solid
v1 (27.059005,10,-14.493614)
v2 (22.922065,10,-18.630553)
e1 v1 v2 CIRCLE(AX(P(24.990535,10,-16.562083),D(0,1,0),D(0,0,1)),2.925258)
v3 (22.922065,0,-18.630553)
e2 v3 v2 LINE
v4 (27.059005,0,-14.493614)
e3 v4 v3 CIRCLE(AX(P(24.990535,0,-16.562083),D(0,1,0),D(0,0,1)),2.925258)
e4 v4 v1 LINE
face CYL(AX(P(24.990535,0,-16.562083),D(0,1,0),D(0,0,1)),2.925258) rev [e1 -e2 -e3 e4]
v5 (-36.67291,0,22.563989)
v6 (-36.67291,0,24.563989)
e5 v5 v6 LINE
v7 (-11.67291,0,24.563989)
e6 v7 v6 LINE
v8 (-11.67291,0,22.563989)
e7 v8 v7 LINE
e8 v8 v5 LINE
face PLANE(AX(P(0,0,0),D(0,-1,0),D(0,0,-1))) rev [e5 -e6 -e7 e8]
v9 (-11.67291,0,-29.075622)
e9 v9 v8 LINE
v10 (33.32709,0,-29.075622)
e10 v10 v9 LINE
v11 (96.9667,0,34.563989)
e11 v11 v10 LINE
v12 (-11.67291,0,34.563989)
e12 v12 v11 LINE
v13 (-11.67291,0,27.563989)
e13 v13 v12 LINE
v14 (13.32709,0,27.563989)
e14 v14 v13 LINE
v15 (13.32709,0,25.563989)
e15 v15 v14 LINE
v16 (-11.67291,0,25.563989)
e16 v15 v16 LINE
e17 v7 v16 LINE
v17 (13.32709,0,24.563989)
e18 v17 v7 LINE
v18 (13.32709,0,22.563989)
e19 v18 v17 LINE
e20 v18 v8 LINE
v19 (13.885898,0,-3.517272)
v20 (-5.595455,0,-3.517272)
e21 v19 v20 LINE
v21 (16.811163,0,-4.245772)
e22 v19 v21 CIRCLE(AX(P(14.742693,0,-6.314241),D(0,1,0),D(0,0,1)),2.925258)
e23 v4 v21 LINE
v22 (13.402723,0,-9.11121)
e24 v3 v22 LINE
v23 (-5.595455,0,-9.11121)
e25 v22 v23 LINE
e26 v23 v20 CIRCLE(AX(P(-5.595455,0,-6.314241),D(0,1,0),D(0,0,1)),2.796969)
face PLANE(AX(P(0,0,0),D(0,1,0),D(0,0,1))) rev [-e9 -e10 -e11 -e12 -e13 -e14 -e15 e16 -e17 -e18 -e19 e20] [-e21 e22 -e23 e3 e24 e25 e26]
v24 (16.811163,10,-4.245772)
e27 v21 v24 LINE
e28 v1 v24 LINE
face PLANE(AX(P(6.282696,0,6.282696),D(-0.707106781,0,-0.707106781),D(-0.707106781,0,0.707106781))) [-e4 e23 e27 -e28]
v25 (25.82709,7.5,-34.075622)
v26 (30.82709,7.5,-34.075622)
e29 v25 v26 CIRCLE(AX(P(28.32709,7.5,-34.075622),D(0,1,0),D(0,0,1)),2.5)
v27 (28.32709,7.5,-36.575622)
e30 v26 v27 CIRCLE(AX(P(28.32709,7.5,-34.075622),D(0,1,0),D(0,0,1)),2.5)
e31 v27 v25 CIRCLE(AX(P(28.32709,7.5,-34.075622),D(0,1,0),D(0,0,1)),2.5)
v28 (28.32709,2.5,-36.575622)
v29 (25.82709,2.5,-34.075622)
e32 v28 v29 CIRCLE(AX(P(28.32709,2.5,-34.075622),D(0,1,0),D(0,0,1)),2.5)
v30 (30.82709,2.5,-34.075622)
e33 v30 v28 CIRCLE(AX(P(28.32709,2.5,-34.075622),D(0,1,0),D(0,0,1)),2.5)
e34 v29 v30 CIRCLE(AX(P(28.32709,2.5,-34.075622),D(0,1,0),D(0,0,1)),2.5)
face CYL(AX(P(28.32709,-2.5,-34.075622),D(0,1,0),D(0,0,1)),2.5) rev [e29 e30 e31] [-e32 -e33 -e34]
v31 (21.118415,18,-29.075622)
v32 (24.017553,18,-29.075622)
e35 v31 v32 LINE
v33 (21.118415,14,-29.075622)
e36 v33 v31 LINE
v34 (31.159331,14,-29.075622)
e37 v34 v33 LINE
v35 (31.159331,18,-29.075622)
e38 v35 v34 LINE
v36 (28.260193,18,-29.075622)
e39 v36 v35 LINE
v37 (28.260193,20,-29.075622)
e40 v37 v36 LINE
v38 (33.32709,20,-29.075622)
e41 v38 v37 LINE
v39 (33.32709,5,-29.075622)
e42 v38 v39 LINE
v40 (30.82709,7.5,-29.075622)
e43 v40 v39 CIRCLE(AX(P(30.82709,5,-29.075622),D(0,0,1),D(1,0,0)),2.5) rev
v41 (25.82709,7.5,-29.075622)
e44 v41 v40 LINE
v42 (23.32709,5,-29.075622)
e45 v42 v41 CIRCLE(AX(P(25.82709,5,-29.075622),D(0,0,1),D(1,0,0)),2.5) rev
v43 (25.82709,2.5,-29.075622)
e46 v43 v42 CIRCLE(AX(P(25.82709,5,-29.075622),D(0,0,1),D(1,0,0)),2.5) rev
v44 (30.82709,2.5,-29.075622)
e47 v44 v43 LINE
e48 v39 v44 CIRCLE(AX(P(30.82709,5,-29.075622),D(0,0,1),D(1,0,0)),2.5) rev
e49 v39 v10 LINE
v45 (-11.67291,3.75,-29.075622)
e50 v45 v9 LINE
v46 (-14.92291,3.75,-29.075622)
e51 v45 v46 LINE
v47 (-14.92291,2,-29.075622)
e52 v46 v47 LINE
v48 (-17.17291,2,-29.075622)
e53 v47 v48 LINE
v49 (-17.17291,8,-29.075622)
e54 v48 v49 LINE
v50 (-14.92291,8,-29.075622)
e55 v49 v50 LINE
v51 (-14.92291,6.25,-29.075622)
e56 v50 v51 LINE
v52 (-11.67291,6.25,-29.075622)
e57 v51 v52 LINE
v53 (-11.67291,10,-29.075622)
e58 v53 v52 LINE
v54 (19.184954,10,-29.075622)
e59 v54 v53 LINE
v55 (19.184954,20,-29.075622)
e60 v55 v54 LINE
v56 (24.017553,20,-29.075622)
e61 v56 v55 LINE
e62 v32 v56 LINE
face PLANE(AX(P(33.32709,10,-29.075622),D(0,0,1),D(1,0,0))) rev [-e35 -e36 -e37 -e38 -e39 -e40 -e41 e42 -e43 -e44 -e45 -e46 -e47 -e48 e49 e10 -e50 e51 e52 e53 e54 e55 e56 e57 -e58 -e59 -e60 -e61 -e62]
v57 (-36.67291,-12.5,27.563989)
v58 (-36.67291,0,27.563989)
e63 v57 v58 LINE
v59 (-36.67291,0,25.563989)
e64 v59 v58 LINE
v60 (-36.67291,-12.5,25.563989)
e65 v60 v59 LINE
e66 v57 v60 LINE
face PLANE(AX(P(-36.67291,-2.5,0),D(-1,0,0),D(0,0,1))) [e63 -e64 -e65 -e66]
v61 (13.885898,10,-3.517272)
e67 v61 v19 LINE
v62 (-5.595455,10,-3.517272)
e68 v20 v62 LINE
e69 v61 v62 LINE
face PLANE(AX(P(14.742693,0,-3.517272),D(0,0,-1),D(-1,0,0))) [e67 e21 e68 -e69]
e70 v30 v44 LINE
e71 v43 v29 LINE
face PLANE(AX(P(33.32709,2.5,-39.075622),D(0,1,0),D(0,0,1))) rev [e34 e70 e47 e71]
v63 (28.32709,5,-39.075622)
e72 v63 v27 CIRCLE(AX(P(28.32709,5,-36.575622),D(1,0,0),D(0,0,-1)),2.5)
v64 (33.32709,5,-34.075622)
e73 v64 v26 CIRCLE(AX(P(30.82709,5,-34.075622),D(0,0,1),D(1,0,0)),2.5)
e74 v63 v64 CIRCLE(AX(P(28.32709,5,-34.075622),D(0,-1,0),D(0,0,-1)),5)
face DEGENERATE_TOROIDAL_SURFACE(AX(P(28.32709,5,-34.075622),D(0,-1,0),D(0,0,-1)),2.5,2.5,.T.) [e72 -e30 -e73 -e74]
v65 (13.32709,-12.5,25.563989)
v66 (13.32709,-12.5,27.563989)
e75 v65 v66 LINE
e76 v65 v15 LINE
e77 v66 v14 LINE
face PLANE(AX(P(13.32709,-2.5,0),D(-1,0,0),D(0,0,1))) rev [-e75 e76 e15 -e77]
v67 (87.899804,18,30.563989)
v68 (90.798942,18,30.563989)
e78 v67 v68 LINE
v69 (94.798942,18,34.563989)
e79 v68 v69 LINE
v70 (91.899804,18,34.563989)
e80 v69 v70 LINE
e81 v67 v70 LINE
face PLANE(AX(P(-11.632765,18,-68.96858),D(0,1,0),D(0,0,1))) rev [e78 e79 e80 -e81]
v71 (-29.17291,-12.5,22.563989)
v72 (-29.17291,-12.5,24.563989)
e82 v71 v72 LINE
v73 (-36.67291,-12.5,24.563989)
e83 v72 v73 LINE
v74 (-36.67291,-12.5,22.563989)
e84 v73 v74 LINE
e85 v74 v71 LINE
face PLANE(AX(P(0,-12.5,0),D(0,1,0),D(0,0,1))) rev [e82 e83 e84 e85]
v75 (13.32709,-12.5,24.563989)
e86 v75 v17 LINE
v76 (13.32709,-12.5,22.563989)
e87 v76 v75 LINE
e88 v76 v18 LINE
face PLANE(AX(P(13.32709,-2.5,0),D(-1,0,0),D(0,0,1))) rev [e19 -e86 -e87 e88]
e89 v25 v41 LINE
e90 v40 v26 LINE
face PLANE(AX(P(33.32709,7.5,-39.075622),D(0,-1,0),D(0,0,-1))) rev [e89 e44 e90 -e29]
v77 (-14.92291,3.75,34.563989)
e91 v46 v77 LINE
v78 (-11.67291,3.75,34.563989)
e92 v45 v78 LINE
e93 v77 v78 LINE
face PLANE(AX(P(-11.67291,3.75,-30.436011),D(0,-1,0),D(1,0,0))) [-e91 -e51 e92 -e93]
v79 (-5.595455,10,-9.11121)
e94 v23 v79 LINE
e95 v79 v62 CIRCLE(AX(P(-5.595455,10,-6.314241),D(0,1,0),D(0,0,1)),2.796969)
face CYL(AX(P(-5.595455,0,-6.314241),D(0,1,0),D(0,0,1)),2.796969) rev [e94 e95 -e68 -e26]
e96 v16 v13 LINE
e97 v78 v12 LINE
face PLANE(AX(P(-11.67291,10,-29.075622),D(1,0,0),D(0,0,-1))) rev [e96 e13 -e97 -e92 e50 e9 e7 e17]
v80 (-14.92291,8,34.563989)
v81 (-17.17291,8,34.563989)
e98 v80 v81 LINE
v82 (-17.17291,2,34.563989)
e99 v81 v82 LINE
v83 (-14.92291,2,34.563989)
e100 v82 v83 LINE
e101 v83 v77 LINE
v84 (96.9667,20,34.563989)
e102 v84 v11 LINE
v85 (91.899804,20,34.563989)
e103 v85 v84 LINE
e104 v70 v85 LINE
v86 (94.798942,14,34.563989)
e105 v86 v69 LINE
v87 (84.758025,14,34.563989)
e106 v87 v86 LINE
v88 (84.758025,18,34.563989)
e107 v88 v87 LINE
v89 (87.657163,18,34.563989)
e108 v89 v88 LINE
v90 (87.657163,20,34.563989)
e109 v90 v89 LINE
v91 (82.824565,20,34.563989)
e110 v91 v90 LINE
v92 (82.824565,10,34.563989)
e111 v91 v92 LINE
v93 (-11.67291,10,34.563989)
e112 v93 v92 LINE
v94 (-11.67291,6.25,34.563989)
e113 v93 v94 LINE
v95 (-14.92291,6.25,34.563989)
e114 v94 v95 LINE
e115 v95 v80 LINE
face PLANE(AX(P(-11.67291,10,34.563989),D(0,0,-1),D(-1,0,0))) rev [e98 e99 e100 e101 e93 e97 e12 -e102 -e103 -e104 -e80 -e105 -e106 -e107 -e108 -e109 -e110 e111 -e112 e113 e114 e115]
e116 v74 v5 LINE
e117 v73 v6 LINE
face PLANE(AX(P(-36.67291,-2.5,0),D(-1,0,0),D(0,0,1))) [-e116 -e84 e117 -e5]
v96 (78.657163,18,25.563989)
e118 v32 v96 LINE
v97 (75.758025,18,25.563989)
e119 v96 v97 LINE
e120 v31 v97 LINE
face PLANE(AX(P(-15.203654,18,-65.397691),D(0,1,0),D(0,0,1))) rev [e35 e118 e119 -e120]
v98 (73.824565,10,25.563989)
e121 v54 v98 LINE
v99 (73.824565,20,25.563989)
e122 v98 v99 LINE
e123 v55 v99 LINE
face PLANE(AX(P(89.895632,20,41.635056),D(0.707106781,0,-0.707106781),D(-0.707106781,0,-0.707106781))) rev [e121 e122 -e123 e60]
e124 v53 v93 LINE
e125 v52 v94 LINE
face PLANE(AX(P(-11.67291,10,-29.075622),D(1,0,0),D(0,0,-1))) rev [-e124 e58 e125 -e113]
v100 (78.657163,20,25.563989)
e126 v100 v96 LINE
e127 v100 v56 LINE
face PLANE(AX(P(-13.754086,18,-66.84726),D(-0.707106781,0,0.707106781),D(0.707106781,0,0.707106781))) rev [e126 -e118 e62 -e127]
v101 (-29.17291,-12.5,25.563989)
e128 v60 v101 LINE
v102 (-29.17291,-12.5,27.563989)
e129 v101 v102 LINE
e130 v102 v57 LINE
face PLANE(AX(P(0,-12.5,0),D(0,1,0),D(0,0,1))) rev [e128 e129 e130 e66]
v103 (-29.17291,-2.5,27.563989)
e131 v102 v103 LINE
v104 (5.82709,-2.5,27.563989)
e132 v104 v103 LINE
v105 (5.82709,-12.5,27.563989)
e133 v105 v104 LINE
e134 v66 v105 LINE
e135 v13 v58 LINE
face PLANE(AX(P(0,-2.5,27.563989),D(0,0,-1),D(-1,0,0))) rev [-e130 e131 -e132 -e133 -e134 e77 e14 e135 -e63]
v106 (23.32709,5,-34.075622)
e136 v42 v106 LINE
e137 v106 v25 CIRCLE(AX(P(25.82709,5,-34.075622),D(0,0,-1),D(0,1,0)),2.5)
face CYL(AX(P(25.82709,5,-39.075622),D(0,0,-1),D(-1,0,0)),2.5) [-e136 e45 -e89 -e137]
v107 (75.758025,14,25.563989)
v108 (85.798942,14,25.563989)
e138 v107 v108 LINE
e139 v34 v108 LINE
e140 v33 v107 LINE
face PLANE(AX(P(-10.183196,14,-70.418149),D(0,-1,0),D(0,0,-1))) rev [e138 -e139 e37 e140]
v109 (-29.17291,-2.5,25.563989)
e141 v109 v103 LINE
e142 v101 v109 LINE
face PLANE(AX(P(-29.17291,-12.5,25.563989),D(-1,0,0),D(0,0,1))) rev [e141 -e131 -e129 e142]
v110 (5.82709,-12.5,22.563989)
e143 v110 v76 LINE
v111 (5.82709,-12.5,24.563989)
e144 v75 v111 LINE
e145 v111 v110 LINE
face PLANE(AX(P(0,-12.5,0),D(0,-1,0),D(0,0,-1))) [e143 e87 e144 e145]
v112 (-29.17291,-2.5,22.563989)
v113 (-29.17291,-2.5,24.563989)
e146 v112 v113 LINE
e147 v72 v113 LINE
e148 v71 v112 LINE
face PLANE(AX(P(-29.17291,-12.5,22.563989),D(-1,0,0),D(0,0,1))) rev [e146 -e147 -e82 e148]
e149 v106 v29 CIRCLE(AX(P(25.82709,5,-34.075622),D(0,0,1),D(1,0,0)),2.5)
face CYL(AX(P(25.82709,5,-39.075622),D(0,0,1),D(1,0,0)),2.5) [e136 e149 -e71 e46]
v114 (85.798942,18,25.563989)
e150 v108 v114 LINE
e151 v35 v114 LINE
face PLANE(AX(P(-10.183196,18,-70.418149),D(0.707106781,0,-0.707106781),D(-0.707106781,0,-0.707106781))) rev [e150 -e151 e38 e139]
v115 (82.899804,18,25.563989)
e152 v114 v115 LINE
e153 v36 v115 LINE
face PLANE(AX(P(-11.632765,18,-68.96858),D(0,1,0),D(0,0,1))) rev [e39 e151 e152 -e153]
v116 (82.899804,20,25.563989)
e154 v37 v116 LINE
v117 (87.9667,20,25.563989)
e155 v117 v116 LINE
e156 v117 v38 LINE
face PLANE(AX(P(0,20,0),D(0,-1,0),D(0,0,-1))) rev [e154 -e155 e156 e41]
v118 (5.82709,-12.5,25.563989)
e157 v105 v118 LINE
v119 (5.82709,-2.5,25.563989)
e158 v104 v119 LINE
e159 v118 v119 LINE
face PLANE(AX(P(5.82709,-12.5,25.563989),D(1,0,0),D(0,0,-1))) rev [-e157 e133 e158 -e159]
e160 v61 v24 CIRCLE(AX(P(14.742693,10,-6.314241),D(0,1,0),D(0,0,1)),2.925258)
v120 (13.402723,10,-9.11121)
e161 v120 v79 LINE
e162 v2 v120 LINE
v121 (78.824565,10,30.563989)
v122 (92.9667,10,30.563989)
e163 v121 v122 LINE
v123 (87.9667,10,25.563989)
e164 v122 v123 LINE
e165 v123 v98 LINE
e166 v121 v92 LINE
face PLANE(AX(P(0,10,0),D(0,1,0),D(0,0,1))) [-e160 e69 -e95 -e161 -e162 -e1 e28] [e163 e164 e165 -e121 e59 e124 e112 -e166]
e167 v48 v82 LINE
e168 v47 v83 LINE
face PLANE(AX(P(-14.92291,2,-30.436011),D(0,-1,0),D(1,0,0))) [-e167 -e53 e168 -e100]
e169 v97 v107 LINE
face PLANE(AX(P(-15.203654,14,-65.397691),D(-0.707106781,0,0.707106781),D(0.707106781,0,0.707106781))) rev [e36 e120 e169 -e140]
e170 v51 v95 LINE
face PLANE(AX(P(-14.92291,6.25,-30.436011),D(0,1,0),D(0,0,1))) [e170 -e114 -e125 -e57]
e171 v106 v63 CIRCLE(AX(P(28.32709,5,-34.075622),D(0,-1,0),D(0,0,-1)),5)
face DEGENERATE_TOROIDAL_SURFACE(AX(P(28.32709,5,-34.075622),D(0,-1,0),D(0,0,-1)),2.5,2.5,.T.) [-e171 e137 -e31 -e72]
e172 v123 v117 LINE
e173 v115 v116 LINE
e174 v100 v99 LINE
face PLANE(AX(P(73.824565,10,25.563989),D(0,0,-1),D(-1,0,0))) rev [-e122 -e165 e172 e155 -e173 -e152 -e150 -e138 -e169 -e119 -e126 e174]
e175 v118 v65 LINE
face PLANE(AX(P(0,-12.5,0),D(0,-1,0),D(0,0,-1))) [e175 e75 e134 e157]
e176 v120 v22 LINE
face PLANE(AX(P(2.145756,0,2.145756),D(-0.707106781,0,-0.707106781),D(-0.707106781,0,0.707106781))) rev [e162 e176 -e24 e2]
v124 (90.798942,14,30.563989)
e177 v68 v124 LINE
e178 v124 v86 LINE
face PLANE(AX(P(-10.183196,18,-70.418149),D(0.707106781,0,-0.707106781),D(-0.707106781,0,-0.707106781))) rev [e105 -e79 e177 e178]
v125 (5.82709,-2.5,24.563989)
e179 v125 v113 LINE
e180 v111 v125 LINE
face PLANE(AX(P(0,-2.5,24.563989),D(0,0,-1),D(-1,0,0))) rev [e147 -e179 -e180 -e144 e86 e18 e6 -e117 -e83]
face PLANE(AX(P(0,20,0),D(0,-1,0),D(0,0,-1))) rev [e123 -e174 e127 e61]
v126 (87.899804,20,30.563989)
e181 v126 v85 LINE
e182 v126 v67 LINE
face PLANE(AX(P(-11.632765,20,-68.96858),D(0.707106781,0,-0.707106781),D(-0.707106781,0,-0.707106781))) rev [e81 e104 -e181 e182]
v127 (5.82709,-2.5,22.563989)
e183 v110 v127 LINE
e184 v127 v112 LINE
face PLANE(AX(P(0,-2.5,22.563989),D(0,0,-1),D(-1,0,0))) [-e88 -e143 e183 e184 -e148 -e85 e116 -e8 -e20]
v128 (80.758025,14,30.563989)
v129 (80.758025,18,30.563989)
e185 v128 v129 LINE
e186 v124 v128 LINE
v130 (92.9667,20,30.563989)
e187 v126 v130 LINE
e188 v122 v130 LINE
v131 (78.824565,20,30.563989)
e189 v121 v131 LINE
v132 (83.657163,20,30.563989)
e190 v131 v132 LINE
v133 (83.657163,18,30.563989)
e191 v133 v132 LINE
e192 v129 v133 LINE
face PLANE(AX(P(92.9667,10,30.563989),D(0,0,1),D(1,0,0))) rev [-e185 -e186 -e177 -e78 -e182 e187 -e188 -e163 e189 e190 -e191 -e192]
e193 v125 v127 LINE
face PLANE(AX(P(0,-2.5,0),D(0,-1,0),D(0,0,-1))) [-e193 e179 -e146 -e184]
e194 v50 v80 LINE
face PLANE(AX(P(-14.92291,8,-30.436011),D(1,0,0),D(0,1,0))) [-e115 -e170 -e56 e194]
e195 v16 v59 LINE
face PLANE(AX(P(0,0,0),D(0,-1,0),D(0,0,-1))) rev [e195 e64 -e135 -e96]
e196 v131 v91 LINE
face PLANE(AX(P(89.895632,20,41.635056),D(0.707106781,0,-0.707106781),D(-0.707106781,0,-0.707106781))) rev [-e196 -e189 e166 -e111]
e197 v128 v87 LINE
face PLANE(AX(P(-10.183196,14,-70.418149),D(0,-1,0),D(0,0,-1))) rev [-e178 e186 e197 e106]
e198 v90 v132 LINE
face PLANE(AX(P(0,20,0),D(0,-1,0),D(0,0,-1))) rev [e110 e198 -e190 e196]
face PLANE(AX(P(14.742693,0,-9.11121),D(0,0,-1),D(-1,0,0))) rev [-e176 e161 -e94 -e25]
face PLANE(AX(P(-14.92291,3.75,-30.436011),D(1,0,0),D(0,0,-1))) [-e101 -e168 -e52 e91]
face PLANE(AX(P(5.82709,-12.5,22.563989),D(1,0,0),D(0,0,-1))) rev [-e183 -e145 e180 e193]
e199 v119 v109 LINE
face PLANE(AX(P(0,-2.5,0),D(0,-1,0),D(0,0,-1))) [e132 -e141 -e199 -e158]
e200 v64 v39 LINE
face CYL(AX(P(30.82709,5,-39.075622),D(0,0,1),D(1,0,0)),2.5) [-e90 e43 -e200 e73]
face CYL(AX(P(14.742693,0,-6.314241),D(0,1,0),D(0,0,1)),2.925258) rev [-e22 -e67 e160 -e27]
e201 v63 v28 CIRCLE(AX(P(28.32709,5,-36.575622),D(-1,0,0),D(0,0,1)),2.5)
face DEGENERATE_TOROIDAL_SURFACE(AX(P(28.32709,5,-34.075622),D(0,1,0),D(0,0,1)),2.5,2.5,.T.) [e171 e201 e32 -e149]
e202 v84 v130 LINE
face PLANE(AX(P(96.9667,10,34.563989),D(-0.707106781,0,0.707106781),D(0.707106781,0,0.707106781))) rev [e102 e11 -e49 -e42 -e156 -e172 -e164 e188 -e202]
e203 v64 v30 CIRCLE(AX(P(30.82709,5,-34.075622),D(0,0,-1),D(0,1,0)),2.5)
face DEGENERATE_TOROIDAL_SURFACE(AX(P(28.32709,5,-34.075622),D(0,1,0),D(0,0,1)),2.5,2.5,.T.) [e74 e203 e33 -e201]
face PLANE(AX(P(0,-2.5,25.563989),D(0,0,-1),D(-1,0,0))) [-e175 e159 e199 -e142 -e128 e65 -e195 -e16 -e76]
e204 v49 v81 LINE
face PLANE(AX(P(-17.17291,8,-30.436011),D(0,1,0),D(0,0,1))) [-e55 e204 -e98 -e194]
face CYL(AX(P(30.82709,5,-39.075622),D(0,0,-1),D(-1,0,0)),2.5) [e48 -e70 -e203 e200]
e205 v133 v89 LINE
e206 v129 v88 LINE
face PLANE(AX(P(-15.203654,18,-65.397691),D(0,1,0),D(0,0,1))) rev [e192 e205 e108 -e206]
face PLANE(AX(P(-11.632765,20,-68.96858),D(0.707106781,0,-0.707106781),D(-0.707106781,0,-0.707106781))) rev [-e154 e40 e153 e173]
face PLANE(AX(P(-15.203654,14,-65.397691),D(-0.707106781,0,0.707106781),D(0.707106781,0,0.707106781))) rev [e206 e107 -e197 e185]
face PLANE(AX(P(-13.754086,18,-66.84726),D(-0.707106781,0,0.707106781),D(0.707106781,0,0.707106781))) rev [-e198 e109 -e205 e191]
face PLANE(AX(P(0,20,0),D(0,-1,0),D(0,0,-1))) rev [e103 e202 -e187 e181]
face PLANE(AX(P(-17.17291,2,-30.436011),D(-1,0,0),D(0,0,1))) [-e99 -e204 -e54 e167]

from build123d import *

# Parameters (mm, degrees)
BOSS_EXTRUDE1_DEPTH  = 10
BOSS_EXTRUDE3_DEPTH  = 65
SKETCH3_W            = 6.566984135
SKETCH3_H            = 1.360389693
CUT_EXTRUDE2_DEPTH   = 65
BOSS_EXTRUDE4_DEPTH  = 3.25
BOSS_EXTRUDE5_DEPTH  = 2.25
SKETCH7_W            = 10
SKETCH7_H            = 5
BOSS_EXTRUDE6_DEPTH  = 10
SKETCH8_R            = 2.5
CUT_EXTRUDE3_DEPTH   = 10
FILLET1_R            = 5
FILLET2_R            = 5
FILLET4_R            = 2.5
FILLET5_R            = 2.5
SKETCH9_W            = 100
SKETCH9_H            = 5.5
CUT_EXTRUDE4_DEPTH   = 100
BOSS_EXTRUDE7_DEPTH  = 10
CUT_EXTRUDE5_DEPTH   = 150
SKETCH12_W           = 29.92089387
SKETCH12_H           = 33.203721342
CUT_EXTRUDE6_DEPTH   = 150
SKETCH14_W           = 19.184954217
SKETCH14_H           = 28.132637814
CUT_EXTRUDE7_DEPTH   = 150
SKETCH16_W           = 15.620456736
SKETCH16_H           = 10.822807293
CUT_EXTRUDE8_DEPTH   = 150
CUT_EXTRUDE9_DEPTH   = 10
CUT_EXTRUDE10_DEPTH  = 10
SKETCH19_W           = 10
SKETCH19_H           = 2
SKETCH19_W_2         = 15
BOSS_EXTRUDE9_DEPTH  = 2.5
SKETCH21_W           = 7.5
SKETCH21_H           = 2
BOSS_EXTRUDE10_DEPTH = 10


with BuildPart() as part:
    # Sketch1 → Boss-Extrude1 (new body)
    with BuildSketch(Plane(origin=(0, 0, 0), x_dir=(1, 0, 0), z_dir=(0, 1, 0))):
        Polygon((-11.672910159, -34.563988547), (96.966700148, -34.563988547), (33.327089841, 29.07562176), (-11.672910159, 29.07562176), align=None)
    extrude(amount=BOSS_EXTRUDE1_DEPTH)

    # Sketch2 → Boss-Extrude3 (add)
    with BuildSketch(Plane.XY.offset(34.563988547)):
        Polygon((-11.672910159, 3.75), (-14.922910159, 3.75), (-14.922910159, 2), (-17.172910159, 2), (-17.172910159, 8), (-14.922910159, 8), (-14.922910159, 6.25), (-11.672910159, 6.25), align=None)
    extrude(amount=-BOSS_EXTRUDE3_DEPTH)

    # Sketch3 → Cut-Extrude2 (cut)
    with BuildSketch(Plane(origin=(0, 8, 0), x_dir=(1, 0, 0), z_dir=(0, 1, 0))):
        with Locations((-13.889418092, 29.755816607)):
            Rectangle(SKETCH3_W, SKETCH3_H)
    extrude(amount=-CUT_EXTRUDE2_DEPTH, mode=Mode.SUBTRACT)

    # Sketch4 → Boss-Extrude4 (add)
    with BuildSketch(Plane(origin=(0, 10, 0), x_dir=(1, 0, 0), z_dir=(0, 1, 0))):
        Polygon((91.663399289, -34.563988547), (28.023788982, 29.07562176), (25.520630977, 29.07562176), (89.160241283, -34.563988547), align=None)
    extrude(amount=BOSS_EXTRUDE4_DEPTH)

    # Sketch6 → Boss-Extrude5 (add)
    with BuildSketch(Plane(origin=(0, 13.25, 0), x_dir=(1, 0, 0), z_dir=(0, 1, 0))):
        Polygon((90.411820286, -34.563988547), (94.136820286, -34.563988547), (30.497209979, 29.07562176), (23.047209979, 29.07562176), (86.686820286, -34.563988547), align=None)
    extrude(amount=BOSS_EXTRUDE5_DEPTH)

    # Sketch7 → Boss-Extrude6 (add)
    with BuildSketch(Plane(origin=(0, 0, -29.07562176), x_dir=(-1, 0, 0), z_dir=(0, 0, -1))):
        with Locations((-28.327089841, 5)):
            Rectangle(SKETCH7_W, SKETCH7_H)
    extrude(amount=BOSS_EXTRUDE6_DEPTH)

    # Sketch8 → Cut-Extrude3 (cut)
    with BuildSketch(Plane(origin=(0, 7.5, 0), x_dir=(1, 0, 0), z_dir=(0, 1, 0))):
        with Locations(Location((28.327089841, 34.07562176, 0), (0, 0, 270))):
            Circle(SKETCH8_R)
    extrude(amount=-CUT_EXTRUDE3_DEPTH, mode=Mode.SUBTRACT)

    # Fillet1
    fillet1_edges = [part.edges().sort_by_distance(p)[0] for p in [
        (23.327089841, 5, -39.07562176),
    ]]
    fillet(fillet1_edges, radius=FILLET1_R)

    # Fillet2
    fillet2_edges = [part.edges().sort_by_distance(p)[0] for p in [
        (33.327089841, 5, -39.07562176),
    ]]
    fillet(fillet2_edges, radius=FILLET2_R - 0.0001)  # a hair under: the kernel refuses the full size

    # Fillet4
    fillet4_edges = [part.edges().sort_by_distance(p)[0] for p in [
        (23.327089841, 7.5, -31.57562176),
        (33.327089841, 7.5, -31.57567176),
        (24.791555935, 7.5, -37.611155666),
    ]]
    fillet(fillet4_edges, radius=FILLET4_R - 0.0001)  # a hair under: the kernel refuses the full size

    # Fillet5
    fillet5_edges = [part.edges().sort_by_distance(p)[0] for p in [
        (23.327089841, 2.5, -31.57562176),
        (33.327089841, 2.5, -31.57567176),
        (24.791555935, 2.5, -37.611155666),
        (31.862653036, 2.5, -37.611184955),
    ]]
    fillet(fillet5_edges, radius=FILLET5_R - 0.0001)  # a hair under: the kernel refuses the full size

    # Sketch9 → Cut-Extrude4 (cut)
    with BuildSketch(Plane.XY.offset(34.563988547)):
        with Locations((44.136820286, 12.75)):
            Rectangle(SKETCH9_W, SKETCH9_H)
    extrude(amount=-CUT_EXTRUDE4_DEPTH, mode=Mode.SUBTRACT)

    # Sketch10 → Boss-Extrude7 (add)
    with BuildSketch(Plane(origin=(0, 10, 0), x_dir=(1, 0, 0), z_dir=(0, 1, 0))):
        Polygon((96.966700148, -34.563988547), (89.895632336, -41.635056358), (7.416994707, 40.84358127), (14.488062519, 47.914649082), align=None)
    extrude(amount=BOSS_EXTRUDE7_DEPTH)

    # Sketch11 → Cut-Extrude5 (cut)
    with BuildSketch(Plane(origin=(65.765344347, 0, 65.765344347), x_dir=(0.7071067811865475, 0, -0.7071067811865477), z_dir=(0.7071067811865477, 0, 0.7071067811865475))):
        Polygon((40.542543722, 20), (40.542543722, 18), (42.592543722, 18), (42.592543722, 14), (35.492543722, 14), (35.492543722, 18), (37.542543722, 18), (37.542543722, 20), align=None)
    extrude(amount=-CUT_EXTRUDE5_DEPTH, mode=Mode.SUBTRACT)

    # Sketch12 → Cut-Extrude6 (cut)
    with BuildSketch(Plane(origin=(0, 10, 0), x_dir=(-1, 0, 0), z_dir=(0, -1, 0))):
        with Locations((-34.145401152, 45.677482431)):
            Rectangle(SKETCH12_W, SKETCH12_H)
    extrude(amount=-CUT_EXTRUDE6_DEPTH, mode=Mode.SUBTRACT)


with BuildPart() as cut_extrude6_piece_1:
    # of the separate pieces the step leaves, piece 1, a body of its own (cut_extrude6_pieces)
    add(part.part.solids().sort_by_distance((30.827189841, 2.5, -29.07562176))[0])

    # Sketch16 → Cut-Extrude8 (cut)
    with BuildSketch(Plane(origin=(0, 10, 0), x_dir=(-1, 0, 0), z_dir=(0, -1, 0))):
        with Locations((-90.634792892, -39.975392193)):
            Rectangle(SKETCH16_W, SKETCH16_H)
    extrude(amount=-CUT_EXTRUDE8_DEPTH, mode=Mode.SUBTRACT)

    # Sketch17 → Cut-Extrude9 (cut)
    with BuildSketch(Plane(origin=(0, 20, 0), x_dir=(1, 0, 0), z_dir=(0, 1, 0))):
        Polygon((92.966700148, -30.563988547), (78.824564524, -30.563988547), (73.824564524, -25.563988547), (87.966700148, -25.563988547), align=None)
    extrude(amount=-CUT_EXTRUDE9_DEPTH, mode=Mode.SUBTRACT)

    # Sketch18 → Cut-Extrude10 (cut)
    with BuildSketch(Plane(origin=(0, 10, 0), x_dir=(1, 0, 0), z_dir=(0, 1, 0))):
        with BuildLine():
            Line((27.059004739, 14.493613639), (16.811162643, 4.245771544))
            ThreePointArc((16.811162643, 4.245771544), (12.674223335, 4.245771544), (12.674223335, 8.382710852))
            Line((12.674223335, 8.382710852), (22.92206543, 18.630552948))
            ThreePointArc((22.92206543, 18.630552948), (27.059004739, 18.630552948), (27.059004739, 14.493613639))
        make_face()
        with BuildLine():
            Line((14.742692989, 3.517272066), (-5.595455146, 3.517272066))
            ThreePointArc((-5.595455146, 3.517272066), (-8.392424278, 6.314241198), (-5.595455146, 9.11121033))
            Line((-5.595455146, 9.11121033), (14.742692989, 9.11121033))
            ThreePointArc((14.742692989, 9.11121033), (17.539662121, 6.314241198), (14.742692989, 3.517272066))
        make_face()
    extrude(amount=-CUT_EXTRUDE10_DEPTH, mode=Mode.SUBTRACT)

    # Sketch19 → Boss-Extrude9 (add)
    with BuildSketch(Plane(origin=(0, 0, 0), x_dir=(-1, 0, 0), z_dir=(0, -1, 0))):
        with Locations((-8.327089841, -26.563988547)):
            Rectangle(SKETCH19_W, SKETCH19_H)
        with Locations((-8.327089841, -23.563988547)):
            Rectangle(SKETCH19_W, SKETCH19_H)
        with Locations((31.672910159, -26.563988547)):
            Rectangle(SKETCH19_W, SKETCH19_H)
        with Locations((31.672910159, -23.563988547)):
            Rectangle(SKETCH19_W, SKETCH19_H)
        with Locations((4.172910159, -26.563988547)):
            Rectangle(SKETCH19_W_2, SKETCH19_H)
        with Locations((4.172910159, -23.563988547)):
            Rectangle(SKETCH19_W_2, SKETCH19_H)
        with Locations((19.172910159, -26.563988547)):
            Rectangle(SKETCH19_W_2, SKETCH19_H)
        with Locations((19.172910159, -23.563988547)):
            Rectangle(SKETCH19_W_2, SKETCH19_H)
    extrude(amount=BOSS_EXTRUDE9_DEPTH)

    # Sketch21 → Boss-Extrude10 (add)
    with BuildSketch(Plane(origin=(0, -2.5, 0), x_dir=(-1, 0, 0), z_dir=(0, -1, 0))):
        with Locations((-9.577089841, -23.563988547)):
            Rectangle(SKETCH21_W, SKETCH21_H)
        with Locations((-9.577089841, -26.563988547)):
            Rectangle(SKETCH21_W, SKETCH21_H)
        with Locations((32.922910159, -26.563988547)):
            Rectangle(SKETCH21_W, SKETCH21_H)
        with Locations((32.922910159, -23.563988547)):
            Rectangle(SKETCH21_W, SKETCH21_H)
    extrude(amount=BOSS_EXTRUDE10_DEPTH)


with BuildPart() as cut_extrude6_piece_2:
    # of the separate pieces the step leaves, piece 2, a body of its own (cut_extrude6_pieces)
    add(part.part.solids().sort_by_distance((7.416994707, 10, -40.84358127))[0])

    # Sketch14 → Cut-Extrude7 (cut)
    with BuildSketch(Plane(origin=(0, 10, 0), x_dir=(-1, 0, 0), z_dir=(0, -1, 0))):
        with Locations((-9.592477109, 43.141940667)):
            Rectangle(SKETCH14_W, SKETCH14_H)
    extrude(amount=-CUT_EXTRUDE7_DEPTH, mode=Mode.SUBTRACT)


solid = cut_extrude6_piece_1.part
